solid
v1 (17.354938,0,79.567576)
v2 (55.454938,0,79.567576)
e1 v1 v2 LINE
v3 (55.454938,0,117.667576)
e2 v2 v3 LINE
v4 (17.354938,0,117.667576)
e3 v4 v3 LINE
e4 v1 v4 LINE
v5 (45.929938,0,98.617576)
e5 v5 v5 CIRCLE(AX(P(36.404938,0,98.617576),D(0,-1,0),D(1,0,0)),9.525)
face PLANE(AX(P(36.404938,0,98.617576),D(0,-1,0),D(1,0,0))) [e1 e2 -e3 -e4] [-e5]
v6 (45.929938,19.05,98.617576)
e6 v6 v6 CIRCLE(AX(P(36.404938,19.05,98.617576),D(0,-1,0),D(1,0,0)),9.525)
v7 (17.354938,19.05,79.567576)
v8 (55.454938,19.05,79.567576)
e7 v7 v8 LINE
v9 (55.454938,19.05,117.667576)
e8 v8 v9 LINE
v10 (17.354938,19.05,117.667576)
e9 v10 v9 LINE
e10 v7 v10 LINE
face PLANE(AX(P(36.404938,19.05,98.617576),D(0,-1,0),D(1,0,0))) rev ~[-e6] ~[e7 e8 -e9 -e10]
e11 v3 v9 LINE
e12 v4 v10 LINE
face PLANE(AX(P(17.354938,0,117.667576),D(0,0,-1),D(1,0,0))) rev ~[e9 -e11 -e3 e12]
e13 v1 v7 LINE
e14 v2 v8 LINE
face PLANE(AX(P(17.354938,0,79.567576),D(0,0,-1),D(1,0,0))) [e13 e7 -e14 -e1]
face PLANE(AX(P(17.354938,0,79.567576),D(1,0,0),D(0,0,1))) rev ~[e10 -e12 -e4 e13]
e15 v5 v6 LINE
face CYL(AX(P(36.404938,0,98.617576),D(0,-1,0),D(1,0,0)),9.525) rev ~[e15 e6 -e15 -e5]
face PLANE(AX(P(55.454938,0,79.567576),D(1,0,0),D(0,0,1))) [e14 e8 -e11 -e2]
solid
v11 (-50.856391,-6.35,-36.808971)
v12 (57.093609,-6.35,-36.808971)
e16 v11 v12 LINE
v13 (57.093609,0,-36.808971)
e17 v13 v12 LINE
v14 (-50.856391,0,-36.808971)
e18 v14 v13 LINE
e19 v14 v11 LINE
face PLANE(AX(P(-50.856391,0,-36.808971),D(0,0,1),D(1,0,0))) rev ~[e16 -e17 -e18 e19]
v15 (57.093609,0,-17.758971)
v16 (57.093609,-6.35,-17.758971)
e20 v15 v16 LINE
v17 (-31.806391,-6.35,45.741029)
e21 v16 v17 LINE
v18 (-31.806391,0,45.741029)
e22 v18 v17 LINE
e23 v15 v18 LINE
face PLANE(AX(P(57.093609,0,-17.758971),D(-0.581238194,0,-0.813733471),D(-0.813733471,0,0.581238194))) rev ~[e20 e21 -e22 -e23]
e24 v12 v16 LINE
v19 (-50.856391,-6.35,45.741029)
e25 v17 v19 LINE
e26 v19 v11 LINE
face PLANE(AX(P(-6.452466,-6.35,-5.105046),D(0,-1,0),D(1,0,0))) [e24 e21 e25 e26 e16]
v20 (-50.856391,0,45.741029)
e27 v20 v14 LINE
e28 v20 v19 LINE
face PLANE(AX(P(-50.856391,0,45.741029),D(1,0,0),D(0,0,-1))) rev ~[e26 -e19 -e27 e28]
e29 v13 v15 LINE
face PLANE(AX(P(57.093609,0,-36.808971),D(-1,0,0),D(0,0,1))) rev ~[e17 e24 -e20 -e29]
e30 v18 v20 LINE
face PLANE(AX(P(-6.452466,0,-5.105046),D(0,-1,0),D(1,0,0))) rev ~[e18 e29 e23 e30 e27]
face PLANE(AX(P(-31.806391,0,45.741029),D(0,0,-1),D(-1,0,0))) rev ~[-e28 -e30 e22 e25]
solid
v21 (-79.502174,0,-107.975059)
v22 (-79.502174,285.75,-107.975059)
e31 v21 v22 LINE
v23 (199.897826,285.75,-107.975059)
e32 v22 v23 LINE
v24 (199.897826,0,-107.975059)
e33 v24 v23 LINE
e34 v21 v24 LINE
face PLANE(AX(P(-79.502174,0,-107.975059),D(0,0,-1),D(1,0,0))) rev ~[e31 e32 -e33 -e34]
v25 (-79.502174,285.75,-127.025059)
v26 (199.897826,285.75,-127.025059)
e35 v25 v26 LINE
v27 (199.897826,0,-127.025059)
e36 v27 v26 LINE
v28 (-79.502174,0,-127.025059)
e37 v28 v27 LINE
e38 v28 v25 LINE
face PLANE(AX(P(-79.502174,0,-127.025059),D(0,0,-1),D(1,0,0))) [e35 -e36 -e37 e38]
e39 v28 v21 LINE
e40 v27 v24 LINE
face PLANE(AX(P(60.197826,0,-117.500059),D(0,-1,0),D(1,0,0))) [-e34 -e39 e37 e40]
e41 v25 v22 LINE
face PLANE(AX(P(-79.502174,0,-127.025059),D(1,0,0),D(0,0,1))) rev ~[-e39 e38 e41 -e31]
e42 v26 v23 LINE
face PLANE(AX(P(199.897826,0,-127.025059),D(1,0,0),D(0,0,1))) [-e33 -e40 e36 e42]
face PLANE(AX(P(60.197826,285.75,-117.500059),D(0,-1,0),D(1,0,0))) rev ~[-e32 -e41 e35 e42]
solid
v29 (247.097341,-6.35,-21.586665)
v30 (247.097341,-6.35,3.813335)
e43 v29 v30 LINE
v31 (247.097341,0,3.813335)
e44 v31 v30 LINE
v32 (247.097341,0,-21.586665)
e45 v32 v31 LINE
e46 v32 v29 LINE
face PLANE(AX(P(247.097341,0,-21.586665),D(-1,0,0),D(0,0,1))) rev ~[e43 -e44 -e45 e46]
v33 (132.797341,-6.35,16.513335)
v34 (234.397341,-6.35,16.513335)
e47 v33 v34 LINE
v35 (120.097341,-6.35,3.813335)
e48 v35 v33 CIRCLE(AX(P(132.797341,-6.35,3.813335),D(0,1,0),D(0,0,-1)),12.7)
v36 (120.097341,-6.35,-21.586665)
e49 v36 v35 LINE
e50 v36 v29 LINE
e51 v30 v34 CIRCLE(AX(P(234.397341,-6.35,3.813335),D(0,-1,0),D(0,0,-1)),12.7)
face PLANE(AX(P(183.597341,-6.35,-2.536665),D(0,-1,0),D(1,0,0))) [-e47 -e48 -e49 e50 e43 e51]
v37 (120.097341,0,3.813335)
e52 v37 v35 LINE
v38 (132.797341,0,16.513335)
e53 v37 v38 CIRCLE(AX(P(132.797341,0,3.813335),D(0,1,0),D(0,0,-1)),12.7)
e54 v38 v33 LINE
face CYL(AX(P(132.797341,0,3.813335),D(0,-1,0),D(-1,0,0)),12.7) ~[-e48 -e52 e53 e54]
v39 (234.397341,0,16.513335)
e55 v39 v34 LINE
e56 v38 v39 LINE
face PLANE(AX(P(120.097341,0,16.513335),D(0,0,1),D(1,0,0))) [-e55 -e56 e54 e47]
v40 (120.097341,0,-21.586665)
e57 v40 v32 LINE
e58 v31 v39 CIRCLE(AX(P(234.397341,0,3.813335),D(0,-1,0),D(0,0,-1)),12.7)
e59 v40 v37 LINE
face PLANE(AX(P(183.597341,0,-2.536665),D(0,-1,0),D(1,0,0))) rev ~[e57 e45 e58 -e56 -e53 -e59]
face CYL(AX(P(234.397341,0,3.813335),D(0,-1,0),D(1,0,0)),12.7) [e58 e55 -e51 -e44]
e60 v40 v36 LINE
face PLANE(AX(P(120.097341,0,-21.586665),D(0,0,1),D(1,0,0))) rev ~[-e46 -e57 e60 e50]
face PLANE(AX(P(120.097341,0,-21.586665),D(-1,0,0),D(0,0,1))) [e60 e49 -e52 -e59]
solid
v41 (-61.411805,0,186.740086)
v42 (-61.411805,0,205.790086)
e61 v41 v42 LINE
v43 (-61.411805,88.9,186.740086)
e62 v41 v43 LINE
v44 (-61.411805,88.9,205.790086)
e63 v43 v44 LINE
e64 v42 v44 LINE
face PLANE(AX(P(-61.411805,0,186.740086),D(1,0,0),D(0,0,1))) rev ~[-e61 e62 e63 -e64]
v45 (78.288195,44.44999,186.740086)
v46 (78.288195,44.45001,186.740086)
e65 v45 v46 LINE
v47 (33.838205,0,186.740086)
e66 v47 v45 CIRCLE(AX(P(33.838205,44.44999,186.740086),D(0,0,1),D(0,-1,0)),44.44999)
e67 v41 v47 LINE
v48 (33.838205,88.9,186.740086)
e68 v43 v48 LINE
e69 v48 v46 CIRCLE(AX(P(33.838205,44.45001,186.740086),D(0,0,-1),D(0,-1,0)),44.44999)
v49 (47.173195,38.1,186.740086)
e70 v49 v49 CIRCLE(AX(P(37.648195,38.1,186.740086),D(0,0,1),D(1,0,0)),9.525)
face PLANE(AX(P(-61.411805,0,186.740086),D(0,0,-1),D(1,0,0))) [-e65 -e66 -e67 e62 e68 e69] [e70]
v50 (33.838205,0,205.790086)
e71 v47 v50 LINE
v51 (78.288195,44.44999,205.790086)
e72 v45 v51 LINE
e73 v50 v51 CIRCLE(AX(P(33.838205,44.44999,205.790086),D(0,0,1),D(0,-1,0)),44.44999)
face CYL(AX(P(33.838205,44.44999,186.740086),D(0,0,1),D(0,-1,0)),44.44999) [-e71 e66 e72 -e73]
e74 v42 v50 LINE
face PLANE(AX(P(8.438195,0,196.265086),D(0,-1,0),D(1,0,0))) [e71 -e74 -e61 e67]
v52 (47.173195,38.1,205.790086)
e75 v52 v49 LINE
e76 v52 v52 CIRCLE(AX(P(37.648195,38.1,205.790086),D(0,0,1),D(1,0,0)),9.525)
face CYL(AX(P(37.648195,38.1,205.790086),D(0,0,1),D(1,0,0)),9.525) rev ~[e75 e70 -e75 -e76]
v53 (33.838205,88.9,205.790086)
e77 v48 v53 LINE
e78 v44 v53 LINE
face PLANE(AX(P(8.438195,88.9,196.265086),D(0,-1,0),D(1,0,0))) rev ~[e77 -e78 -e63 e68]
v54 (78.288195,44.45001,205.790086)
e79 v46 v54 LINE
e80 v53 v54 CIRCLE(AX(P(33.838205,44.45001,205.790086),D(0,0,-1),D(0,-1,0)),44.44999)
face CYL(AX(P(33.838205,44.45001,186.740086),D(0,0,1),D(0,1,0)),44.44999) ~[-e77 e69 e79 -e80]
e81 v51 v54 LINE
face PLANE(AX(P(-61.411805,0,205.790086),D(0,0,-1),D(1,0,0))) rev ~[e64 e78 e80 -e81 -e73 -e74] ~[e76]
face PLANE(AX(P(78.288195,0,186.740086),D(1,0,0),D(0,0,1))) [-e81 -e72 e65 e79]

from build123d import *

# Parameters (mm, degrees)
F1_DEPTH  = 6.35
F2_W      = 127
F2_H      = 38.1
F3_DEPTH  = 6.35
F4_R      = 12.7
F5_W      = 279.4
F5_H      = 19.05
F6_DEPTH  = 285.75
F7_W      = 38.1
F7_H      = 38.1
F7_R      = 9.525
F8_DEPTH  = 19.05
F9_W      = 139.7
F9_H      = 19.05
F10_DEPTH = 88.9
F11_R     = 9.525
F12_DEPTH = 76.2
F13_R     = 44.44999


# Not quite as in the source:
# - a fillet or chamfer is up to 0.001 mm smaller than in the source, because OpenCascade refuses the exact size


with BuildPart() as f1:
    # F0 (on Front) → F1 (new body)
    with BuildSketch(Plane.XZ):
        Polygon((-31.8063910506, 45.7410294402), (-50.8563910506, 45.7410294402), (-50.8563910506, -36.8089705598), (57.0936089494, -36.8089705598), (57.0936089494, -17.7589705598), align=None)
    extrude(amount=F1_DEPTH)


with BuildPart() as f3:
    # F2 (on Front) → F3 (new body)
    with BuildSketch(Plane.XZ):
        with Locations((183.5973408857, -2.5366649497)):
            Rectangle(F2_W, F2_H)
    extrude(amount=F3_DEPTH)

    # F4
    f4_edges = [f3.edges().sort_by_distance(p)[0] for p in [
        (120.097341, -3.175, 16.513335),
        (247.097341, -3.175, 16.513335),
    ]]
    fillet(f4_edges, radius=F4_R)


with BuildPart() as f6:
    # F5 (on Front) → F6 (new body)
    with BuildSketch(Plane.XZ):
        with Locations((60.1978264749, -117.5000589487)):
            Rectangle(F5_W, F5_H)
    extrude(amount=-F6_DEPTH)


with BuildPart() as f8:
    # F7 (on Front) → F8 (new body)
    with BuildSketch(Plane.XZ):
        with Locations((36.4049384925, 98.6175760627)):
            Rectangle(F7_W, F7_H)
        with Locations((36.4049384925, 98.6175760627)):
            Circle(F7_R, mode=Mode.SUBTRACT)
    extrude(amount=-F8_DEPTH)


with BuildPart() as f10:
    # F9 (on Front) → F10 (new body)
    with BuildSketch(Plane.XZ):
        with Locations((8.4381951019, 196.2650863438)):
            Rectangle(F9_W, F9_H)
    extrude(amount=-F10_DEPTH)

    # F11 (on face) → F12 (cut)
    with BuildSketch(Plane.XY.offset(205.7900863438)):
        with Locations((37.6481951019, 38.1)):
            Circle(F11_R)
    extrude(amount=-F12_DEPTH, mode=Mode.SUBTRACT)

    # F13 (radius 44.45 in the source; OpenCascade refuses exactly that, so slightly less here)
    f13_edges = [f10.edges().sort_by_distance(p)[0] for p in [
        (78.288195, 0, 196.265086),
        (78.288195, 88.9, 196.265086),
    ]]
    fillet(f13_edges, radius=F13_R)


solid = Compound([f1.part, f3.part, f6.part, f8.part, f10.part])
